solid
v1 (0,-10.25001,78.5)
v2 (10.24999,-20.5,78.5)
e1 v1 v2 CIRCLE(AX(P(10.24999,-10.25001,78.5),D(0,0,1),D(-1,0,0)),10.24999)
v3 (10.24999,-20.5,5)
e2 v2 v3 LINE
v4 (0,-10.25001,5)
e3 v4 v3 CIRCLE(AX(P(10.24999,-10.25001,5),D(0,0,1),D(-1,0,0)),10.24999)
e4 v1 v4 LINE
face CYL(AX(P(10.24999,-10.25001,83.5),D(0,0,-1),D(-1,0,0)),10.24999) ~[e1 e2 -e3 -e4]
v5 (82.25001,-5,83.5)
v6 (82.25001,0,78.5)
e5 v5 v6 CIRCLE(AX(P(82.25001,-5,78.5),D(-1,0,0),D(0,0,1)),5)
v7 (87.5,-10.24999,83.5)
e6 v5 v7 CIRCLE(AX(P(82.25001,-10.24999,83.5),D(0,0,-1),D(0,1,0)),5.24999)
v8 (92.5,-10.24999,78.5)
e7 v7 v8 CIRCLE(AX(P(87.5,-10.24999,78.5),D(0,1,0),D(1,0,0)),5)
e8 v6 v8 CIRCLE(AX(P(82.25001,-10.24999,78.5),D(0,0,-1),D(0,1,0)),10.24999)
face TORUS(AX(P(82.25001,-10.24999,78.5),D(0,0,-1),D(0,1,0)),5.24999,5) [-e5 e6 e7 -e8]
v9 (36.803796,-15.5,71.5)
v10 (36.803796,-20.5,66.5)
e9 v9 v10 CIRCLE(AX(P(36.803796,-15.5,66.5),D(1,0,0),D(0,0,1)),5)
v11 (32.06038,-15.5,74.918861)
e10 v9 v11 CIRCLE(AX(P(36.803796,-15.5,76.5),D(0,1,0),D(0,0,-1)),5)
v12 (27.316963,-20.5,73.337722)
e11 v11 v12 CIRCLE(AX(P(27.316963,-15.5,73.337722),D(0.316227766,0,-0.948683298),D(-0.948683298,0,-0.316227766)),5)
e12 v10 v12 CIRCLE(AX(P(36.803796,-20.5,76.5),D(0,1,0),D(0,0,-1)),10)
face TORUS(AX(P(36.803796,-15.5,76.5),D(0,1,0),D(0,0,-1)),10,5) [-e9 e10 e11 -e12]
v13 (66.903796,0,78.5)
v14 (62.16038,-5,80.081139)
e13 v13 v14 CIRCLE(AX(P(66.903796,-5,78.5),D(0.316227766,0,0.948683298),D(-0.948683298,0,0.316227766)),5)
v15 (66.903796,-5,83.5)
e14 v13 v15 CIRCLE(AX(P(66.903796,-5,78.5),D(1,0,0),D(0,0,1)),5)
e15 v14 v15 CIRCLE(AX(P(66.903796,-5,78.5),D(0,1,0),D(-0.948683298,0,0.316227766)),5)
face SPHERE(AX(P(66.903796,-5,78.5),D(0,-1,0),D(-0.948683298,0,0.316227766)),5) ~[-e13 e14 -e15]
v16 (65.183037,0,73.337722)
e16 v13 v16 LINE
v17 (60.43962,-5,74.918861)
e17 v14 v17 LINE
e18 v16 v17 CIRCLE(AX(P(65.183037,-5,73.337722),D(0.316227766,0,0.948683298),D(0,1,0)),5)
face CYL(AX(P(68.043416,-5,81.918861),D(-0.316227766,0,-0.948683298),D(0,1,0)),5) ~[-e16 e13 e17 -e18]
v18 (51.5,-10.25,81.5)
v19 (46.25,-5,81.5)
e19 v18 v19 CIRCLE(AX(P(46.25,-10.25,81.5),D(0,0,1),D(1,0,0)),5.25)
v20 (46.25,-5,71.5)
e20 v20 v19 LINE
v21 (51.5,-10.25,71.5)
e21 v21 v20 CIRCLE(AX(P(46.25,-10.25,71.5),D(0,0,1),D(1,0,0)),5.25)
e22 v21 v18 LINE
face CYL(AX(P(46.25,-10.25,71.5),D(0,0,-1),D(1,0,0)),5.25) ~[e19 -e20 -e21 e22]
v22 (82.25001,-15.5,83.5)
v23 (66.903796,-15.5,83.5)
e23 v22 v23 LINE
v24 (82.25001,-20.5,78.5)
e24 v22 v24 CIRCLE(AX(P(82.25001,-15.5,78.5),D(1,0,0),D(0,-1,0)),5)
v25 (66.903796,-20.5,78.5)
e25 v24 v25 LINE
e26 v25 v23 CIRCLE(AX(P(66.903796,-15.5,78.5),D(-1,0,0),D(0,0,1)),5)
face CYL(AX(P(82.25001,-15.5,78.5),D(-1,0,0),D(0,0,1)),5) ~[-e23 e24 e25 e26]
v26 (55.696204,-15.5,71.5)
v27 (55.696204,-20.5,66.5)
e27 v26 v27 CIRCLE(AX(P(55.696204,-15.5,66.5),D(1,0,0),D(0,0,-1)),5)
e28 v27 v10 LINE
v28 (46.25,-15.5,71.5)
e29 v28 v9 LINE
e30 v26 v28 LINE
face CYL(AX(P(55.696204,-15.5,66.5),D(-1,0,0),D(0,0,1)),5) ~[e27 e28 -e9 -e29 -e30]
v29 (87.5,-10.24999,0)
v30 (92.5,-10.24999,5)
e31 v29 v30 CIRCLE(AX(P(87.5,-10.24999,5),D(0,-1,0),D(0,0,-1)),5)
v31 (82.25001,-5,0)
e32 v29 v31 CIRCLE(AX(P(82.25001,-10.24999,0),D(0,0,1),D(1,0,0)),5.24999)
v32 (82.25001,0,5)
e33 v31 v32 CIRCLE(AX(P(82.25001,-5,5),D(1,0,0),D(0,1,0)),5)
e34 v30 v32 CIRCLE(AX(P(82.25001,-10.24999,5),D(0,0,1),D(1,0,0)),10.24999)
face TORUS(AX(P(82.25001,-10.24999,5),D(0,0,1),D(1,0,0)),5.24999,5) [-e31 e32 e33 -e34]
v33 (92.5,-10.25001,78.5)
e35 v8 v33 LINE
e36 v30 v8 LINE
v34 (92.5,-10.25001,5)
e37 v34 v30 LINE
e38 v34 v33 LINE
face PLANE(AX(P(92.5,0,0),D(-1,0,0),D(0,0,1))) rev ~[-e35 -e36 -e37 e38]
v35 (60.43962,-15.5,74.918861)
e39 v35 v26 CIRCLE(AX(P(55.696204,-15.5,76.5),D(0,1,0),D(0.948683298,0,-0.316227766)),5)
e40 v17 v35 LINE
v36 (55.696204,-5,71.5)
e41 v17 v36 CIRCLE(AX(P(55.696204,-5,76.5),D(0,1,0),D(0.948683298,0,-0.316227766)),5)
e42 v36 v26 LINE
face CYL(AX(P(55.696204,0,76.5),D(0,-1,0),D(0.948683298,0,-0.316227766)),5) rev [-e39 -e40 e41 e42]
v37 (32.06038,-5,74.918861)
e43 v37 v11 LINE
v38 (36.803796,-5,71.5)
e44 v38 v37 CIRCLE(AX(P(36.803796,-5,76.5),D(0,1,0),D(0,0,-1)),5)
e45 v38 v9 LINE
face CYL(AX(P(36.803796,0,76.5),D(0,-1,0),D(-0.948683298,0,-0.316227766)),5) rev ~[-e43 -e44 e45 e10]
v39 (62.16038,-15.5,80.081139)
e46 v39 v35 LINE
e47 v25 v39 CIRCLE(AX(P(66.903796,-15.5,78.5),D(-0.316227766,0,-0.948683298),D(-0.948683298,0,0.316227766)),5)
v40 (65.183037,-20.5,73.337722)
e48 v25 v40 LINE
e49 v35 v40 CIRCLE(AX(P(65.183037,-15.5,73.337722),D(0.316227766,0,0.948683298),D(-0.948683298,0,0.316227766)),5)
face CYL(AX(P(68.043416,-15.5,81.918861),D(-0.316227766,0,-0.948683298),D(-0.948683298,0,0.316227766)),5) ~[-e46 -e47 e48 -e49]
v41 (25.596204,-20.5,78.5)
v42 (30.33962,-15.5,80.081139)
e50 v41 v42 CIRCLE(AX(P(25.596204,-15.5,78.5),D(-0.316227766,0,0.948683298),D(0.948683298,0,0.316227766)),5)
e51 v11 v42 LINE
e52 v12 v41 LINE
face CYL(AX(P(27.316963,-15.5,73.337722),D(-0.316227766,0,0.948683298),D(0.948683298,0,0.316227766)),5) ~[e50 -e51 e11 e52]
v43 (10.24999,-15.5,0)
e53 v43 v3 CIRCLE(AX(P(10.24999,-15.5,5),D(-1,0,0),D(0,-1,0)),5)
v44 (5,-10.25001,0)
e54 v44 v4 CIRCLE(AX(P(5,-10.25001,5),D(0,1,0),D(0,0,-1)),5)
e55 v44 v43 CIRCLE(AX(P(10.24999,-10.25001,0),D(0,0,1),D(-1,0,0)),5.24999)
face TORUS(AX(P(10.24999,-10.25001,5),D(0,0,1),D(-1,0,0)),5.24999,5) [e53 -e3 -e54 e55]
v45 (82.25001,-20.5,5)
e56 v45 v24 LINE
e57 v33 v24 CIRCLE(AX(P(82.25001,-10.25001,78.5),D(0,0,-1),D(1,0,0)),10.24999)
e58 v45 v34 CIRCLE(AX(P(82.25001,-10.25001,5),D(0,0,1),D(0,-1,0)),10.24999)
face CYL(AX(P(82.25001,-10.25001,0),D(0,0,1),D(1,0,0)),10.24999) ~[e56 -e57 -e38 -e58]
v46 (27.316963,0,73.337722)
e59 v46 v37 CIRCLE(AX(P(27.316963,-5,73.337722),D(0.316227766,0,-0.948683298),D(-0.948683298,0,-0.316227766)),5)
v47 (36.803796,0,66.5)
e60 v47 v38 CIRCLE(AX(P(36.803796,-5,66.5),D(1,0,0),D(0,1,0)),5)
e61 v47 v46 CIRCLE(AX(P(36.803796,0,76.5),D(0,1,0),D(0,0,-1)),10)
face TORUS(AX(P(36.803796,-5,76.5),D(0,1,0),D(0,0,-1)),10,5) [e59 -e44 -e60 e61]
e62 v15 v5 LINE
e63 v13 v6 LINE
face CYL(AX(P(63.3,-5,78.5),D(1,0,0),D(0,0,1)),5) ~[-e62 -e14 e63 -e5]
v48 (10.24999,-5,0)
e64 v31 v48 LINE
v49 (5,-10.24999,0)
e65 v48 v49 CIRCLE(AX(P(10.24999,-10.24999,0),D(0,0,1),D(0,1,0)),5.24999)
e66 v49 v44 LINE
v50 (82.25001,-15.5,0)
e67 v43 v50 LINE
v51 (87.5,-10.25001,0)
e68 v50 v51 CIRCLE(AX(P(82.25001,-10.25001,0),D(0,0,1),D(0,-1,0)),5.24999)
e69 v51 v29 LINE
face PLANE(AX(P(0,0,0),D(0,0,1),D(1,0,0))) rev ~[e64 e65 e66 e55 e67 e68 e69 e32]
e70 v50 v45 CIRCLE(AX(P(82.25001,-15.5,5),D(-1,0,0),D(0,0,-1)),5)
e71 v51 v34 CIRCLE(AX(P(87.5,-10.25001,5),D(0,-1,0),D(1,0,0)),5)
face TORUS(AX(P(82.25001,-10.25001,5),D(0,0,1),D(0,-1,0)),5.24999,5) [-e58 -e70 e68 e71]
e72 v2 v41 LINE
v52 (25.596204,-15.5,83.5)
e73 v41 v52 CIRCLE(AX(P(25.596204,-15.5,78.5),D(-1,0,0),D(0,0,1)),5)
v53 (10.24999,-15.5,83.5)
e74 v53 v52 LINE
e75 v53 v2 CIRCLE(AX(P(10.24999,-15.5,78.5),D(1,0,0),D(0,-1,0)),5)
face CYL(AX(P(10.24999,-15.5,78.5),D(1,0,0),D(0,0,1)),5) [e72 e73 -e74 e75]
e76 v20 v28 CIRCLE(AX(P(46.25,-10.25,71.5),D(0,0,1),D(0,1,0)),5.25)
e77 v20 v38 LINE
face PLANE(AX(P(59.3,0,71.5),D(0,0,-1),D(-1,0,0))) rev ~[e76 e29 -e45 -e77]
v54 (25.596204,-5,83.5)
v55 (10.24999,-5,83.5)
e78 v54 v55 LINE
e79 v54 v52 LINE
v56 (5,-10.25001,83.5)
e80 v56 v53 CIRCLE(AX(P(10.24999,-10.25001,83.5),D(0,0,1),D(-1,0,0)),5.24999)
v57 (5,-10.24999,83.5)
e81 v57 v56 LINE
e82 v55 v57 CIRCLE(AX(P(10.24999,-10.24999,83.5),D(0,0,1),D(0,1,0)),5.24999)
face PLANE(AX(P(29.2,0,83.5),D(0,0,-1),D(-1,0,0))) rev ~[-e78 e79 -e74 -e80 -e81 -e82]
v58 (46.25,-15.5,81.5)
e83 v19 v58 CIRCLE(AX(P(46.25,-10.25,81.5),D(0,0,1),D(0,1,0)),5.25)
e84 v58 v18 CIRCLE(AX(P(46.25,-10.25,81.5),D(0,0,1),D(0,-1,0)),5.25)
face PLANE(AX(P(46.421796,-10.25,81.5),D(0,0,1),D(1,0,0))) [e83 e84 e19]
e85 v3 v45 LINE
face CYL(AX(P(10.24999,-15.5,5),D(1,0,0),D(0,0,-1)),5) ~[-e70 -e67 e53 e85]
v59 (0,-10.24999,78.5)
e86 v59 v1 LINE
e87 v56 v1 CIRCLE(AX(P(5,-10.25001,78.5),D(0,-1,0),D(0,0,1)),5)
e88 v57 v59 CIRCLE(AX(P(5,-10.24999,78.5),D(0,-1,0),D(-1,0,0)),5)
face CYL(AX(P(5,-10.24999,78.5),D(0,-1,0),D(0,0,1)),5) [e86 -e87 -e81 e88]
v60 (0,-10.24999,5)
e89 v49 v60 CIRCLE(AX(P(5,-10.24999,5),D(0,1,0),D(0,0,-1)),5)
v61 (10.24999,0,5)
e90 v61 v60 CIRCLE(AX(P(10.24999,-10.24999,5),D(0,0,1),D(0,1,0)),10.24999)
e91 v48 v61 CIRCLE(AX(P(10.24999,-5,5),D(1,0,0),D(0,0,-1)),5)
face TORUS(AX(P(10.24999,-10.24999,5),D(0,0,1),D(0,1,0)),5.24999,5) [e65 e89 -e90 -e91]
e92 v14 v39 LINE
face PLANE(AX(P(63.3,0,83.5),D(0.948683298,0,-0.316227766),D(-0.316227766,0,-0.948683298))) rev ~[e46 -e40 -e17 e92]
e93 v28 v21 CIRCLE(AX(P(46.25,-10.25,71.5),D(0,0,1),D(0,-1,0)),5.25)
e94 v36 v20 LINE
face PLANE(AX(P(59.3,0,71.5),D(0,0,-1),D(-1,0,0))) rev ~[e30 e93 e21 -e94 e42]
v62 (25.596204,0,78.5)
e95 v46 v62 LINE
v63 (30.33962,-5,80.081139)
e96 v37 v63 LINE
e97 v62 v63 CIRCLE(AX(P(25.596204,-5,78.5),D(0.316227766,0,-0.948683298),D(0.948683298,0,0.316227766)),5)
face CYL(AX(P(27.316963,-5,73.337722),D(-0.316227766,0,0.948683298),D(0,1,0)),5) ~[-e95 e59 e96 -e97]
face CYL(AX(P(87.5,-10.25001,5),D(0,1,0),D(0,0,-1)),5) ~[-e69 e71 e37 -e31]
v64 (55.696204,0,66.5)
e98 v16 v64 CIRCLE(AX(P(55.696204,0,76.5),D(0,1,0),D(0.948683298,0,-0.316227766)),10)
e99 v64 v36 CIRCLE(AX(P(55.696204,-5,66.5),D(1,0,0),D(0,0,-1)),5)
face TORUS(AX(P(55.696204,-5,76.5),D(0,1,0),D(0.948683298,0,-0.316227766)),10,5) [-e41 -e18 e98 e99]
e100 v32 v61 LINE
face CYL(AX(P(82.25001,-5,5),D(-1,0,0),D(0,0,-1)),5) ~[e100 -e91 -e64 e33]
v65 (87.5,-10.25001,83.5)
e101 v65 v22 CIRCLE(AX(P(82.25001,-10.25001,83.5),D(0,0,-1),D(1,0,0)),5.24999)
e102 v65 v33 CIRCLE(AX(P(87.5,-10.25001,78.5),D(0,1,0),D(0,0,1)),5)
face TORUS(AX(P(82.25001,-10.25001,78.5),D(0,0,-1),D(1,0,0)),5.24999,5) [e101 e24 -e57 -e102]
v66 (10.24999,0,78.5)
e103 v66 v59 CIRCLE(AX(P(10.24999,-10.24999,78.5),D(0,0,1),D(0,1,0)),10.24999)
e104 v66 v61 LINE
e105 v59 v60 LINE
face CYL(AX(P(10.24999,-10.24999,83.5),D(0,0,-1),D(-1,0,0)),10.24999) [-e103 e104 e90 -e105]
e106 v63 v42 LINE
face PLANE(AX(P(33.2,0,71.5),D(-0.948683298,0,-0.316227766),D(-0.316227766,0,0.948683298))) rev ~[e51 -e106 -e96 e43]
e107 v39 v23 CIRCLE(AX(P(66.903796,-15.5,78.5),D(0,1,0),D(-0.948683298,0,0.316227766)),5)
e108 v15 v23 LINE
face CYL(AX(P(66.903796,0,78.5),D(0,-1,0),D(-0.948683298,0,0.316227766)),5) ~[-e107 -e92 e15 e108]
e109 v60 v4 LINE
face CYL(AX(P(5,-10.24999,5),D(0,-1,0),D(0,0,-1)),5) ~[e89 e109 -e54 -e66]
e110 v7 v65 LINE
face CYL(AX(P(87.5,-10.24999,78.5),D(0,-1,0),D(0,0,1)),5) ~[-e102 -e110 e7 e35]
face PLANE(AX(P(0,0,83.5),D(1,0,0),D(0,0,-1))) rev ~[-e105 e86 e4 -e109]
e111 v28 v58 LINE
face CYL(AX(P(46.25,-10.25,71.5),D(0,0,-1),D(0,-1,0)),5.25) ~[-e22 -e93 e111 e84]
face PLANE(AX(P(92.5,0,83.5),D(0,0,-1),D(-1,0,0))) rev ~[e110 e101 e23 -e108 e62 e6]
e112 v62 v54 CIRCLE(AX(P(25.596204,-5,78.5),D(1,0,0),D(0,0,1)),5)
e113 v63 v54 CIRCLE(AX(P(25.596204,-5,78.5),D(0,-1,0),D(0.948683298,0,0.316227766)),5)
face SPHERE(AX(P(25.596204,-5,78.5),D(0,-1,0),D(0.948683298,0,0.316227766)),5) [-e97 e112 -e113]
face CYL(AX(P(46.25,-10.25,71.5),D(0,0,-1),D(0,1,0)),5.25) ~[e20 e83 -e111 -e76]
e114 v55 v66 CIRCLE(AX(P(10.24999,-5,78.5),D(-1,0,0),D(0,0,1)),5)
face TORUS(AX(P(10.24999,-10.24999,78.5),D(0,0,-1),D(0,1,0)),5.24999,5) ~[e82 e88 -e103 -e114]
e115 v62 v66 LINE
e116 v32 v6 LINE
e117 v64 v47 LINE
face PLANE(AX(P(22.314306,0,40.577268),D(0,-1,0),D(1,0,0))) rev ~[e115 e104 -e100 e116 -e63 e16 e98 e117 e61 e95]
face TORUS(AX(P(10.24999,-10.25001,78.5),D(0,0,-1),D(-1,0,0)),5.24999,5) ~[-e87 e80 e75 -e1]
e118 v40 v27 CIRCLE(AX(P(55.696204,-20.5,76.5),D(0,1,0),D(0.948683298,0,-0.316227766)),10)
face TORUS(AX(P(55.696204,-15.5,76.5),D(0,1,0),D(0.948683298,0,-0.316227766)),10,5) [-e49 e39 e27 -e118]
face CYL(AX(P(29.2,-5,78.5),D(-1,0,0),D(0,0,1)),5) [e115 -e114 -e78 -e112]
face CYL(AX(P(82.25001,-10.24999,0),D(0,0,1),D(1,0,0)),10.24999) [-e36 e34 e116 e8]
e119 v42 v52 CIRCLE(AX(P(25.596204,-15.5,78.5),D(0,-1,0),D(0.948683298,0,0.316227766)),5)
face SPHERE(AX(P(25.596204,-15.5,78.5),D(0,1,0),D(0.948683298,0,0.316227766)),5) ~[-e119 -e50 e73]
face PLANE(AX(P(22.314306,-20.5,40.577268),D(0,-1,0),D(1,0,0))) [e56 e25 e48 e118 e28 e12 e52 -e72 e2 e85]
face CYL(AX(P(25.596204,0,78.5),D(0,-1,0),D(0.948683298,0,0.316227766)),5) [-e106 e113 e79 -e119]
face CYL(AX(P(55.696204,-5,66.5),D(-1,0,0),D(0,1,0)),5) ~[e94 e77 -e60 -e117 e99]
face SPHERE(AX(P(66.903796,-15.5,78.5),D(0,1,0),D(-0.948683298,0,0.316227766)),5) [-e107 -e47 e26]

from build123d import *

# Parameters (mm, degrees)
F1_DEPTH = 20.5
F2_R     = 10.24999
F3_F1_R  = 5
F3_F2_R  = 5
F5_DEPTH = 10


# Not quite as in the source:
# - a fillet or chamfer is up to 0.001 mm smaller than in the source, because OpenCascade refuses the exact size


with BuildPart() as f1:
    # F0 (on Front) → F1 (new body)
    with BuildSketch(Plane.XZ):
        Polygon((0, 83.5), (0, 0), (46.25, 0), (46.25, 71.5), (33.2, 71.5), (29.2, 83.5), align=None)
        Polygon((46.25, 71.5), (46.25, 0), (92.5, 0), (92.5, 83.5), (63.3, 83.5), (59.3, 71.5), align=None)
    extrude(amount=F1_DEPTH)

    # F2 (radius 10.25 in the source; OpenCascade refuses exactly that, so slightly less here)
    f2_edges = [f1.edges().sort_by_distance(p)[0] for p in [
        (0, -20.5, 41.75),
        (0, 0, 41.75),
        (92.5, -20.5, 41.75),
        (92.5, 0, 41.75),
    ]]
    fillet(f2_edges, radius=F2_R)

    # F3: fillet of radius 5 on 24 edges, made by hand

    # F3_f1
    f3_f1_edges = [f1.edges().sort_by_distance(p)[0] for p in [
        (59.3, -10.25, 71.5),
        (33.2, -10.25, 71.5),
    ]]
    fillet(f3_f1_edges, radius=F3_F1_R)

    # F3_f2
    f3_f2_edges = [f1.edges().sort_by_distance(p)[0] for p in [
        (92.5, -10.25, 83.5),
        (89.4978474361, -3.0021525639, 83.5),
        (89.4978474361, -17.4978474361, 83.5),
        (72.775005, 0, 83.5),
        (72.775005, -20.5, 83.5),
        (63.3, -10.25, 83.5),
        (0, -10.25, 83.5),
        (3.0021525639, -3.0021525639, 83.5),
        (3.0021525639, -17.4978474361, 83.5),
        (19.724995, 0, 83.5),
        (19.724995, -20.5, 83.5),
        (29.2, -10.25, 83.5),
        (0, -10.25, 0),
        (3.0021525639, -3.0021525639, 0),
        (3.0021525639, -17.4978474361, 0),
        (46.25, 0, 0),
        (46.25, -20.5, 0),
        (89.4978474361, -3.0021525639, 0),
        (89.4978474361, -17.4978474361, 0),
        (92.5, -10.25, 0),
        (46.25, 0, 71.5),
        (46.25, -20.5, 71.5),
        (58.619755323, -20.5, 72.4437890741),
        (33.880244677, -20.5, 72.4437890741),
        (58.619755323, 0, 72.4437890741),
        (33.880244677, 0, 72.4437890741),
    ]]
    fillet(f3_f2_edges, radius=F3_F2_R)

    # F4 (on face) → F5 (join)
    with BuildSketch(Plane.XY.offset(71.5)):
        with BuildLine():
            ThreePointArc((46.25, -15.5), (49.9623106012, -13.9623106012), (51.5, -10.25))
            ThreePointArc((51.5, -10.25), (49.9623106012, -6.5376893988), (46.25, -5))
            ThreePointArc((46.25, -5), (41, -10.25), (46.25, -15.5))
        make_face()
    extrude(amount=F5_DEPTH)


solid = f1.part
